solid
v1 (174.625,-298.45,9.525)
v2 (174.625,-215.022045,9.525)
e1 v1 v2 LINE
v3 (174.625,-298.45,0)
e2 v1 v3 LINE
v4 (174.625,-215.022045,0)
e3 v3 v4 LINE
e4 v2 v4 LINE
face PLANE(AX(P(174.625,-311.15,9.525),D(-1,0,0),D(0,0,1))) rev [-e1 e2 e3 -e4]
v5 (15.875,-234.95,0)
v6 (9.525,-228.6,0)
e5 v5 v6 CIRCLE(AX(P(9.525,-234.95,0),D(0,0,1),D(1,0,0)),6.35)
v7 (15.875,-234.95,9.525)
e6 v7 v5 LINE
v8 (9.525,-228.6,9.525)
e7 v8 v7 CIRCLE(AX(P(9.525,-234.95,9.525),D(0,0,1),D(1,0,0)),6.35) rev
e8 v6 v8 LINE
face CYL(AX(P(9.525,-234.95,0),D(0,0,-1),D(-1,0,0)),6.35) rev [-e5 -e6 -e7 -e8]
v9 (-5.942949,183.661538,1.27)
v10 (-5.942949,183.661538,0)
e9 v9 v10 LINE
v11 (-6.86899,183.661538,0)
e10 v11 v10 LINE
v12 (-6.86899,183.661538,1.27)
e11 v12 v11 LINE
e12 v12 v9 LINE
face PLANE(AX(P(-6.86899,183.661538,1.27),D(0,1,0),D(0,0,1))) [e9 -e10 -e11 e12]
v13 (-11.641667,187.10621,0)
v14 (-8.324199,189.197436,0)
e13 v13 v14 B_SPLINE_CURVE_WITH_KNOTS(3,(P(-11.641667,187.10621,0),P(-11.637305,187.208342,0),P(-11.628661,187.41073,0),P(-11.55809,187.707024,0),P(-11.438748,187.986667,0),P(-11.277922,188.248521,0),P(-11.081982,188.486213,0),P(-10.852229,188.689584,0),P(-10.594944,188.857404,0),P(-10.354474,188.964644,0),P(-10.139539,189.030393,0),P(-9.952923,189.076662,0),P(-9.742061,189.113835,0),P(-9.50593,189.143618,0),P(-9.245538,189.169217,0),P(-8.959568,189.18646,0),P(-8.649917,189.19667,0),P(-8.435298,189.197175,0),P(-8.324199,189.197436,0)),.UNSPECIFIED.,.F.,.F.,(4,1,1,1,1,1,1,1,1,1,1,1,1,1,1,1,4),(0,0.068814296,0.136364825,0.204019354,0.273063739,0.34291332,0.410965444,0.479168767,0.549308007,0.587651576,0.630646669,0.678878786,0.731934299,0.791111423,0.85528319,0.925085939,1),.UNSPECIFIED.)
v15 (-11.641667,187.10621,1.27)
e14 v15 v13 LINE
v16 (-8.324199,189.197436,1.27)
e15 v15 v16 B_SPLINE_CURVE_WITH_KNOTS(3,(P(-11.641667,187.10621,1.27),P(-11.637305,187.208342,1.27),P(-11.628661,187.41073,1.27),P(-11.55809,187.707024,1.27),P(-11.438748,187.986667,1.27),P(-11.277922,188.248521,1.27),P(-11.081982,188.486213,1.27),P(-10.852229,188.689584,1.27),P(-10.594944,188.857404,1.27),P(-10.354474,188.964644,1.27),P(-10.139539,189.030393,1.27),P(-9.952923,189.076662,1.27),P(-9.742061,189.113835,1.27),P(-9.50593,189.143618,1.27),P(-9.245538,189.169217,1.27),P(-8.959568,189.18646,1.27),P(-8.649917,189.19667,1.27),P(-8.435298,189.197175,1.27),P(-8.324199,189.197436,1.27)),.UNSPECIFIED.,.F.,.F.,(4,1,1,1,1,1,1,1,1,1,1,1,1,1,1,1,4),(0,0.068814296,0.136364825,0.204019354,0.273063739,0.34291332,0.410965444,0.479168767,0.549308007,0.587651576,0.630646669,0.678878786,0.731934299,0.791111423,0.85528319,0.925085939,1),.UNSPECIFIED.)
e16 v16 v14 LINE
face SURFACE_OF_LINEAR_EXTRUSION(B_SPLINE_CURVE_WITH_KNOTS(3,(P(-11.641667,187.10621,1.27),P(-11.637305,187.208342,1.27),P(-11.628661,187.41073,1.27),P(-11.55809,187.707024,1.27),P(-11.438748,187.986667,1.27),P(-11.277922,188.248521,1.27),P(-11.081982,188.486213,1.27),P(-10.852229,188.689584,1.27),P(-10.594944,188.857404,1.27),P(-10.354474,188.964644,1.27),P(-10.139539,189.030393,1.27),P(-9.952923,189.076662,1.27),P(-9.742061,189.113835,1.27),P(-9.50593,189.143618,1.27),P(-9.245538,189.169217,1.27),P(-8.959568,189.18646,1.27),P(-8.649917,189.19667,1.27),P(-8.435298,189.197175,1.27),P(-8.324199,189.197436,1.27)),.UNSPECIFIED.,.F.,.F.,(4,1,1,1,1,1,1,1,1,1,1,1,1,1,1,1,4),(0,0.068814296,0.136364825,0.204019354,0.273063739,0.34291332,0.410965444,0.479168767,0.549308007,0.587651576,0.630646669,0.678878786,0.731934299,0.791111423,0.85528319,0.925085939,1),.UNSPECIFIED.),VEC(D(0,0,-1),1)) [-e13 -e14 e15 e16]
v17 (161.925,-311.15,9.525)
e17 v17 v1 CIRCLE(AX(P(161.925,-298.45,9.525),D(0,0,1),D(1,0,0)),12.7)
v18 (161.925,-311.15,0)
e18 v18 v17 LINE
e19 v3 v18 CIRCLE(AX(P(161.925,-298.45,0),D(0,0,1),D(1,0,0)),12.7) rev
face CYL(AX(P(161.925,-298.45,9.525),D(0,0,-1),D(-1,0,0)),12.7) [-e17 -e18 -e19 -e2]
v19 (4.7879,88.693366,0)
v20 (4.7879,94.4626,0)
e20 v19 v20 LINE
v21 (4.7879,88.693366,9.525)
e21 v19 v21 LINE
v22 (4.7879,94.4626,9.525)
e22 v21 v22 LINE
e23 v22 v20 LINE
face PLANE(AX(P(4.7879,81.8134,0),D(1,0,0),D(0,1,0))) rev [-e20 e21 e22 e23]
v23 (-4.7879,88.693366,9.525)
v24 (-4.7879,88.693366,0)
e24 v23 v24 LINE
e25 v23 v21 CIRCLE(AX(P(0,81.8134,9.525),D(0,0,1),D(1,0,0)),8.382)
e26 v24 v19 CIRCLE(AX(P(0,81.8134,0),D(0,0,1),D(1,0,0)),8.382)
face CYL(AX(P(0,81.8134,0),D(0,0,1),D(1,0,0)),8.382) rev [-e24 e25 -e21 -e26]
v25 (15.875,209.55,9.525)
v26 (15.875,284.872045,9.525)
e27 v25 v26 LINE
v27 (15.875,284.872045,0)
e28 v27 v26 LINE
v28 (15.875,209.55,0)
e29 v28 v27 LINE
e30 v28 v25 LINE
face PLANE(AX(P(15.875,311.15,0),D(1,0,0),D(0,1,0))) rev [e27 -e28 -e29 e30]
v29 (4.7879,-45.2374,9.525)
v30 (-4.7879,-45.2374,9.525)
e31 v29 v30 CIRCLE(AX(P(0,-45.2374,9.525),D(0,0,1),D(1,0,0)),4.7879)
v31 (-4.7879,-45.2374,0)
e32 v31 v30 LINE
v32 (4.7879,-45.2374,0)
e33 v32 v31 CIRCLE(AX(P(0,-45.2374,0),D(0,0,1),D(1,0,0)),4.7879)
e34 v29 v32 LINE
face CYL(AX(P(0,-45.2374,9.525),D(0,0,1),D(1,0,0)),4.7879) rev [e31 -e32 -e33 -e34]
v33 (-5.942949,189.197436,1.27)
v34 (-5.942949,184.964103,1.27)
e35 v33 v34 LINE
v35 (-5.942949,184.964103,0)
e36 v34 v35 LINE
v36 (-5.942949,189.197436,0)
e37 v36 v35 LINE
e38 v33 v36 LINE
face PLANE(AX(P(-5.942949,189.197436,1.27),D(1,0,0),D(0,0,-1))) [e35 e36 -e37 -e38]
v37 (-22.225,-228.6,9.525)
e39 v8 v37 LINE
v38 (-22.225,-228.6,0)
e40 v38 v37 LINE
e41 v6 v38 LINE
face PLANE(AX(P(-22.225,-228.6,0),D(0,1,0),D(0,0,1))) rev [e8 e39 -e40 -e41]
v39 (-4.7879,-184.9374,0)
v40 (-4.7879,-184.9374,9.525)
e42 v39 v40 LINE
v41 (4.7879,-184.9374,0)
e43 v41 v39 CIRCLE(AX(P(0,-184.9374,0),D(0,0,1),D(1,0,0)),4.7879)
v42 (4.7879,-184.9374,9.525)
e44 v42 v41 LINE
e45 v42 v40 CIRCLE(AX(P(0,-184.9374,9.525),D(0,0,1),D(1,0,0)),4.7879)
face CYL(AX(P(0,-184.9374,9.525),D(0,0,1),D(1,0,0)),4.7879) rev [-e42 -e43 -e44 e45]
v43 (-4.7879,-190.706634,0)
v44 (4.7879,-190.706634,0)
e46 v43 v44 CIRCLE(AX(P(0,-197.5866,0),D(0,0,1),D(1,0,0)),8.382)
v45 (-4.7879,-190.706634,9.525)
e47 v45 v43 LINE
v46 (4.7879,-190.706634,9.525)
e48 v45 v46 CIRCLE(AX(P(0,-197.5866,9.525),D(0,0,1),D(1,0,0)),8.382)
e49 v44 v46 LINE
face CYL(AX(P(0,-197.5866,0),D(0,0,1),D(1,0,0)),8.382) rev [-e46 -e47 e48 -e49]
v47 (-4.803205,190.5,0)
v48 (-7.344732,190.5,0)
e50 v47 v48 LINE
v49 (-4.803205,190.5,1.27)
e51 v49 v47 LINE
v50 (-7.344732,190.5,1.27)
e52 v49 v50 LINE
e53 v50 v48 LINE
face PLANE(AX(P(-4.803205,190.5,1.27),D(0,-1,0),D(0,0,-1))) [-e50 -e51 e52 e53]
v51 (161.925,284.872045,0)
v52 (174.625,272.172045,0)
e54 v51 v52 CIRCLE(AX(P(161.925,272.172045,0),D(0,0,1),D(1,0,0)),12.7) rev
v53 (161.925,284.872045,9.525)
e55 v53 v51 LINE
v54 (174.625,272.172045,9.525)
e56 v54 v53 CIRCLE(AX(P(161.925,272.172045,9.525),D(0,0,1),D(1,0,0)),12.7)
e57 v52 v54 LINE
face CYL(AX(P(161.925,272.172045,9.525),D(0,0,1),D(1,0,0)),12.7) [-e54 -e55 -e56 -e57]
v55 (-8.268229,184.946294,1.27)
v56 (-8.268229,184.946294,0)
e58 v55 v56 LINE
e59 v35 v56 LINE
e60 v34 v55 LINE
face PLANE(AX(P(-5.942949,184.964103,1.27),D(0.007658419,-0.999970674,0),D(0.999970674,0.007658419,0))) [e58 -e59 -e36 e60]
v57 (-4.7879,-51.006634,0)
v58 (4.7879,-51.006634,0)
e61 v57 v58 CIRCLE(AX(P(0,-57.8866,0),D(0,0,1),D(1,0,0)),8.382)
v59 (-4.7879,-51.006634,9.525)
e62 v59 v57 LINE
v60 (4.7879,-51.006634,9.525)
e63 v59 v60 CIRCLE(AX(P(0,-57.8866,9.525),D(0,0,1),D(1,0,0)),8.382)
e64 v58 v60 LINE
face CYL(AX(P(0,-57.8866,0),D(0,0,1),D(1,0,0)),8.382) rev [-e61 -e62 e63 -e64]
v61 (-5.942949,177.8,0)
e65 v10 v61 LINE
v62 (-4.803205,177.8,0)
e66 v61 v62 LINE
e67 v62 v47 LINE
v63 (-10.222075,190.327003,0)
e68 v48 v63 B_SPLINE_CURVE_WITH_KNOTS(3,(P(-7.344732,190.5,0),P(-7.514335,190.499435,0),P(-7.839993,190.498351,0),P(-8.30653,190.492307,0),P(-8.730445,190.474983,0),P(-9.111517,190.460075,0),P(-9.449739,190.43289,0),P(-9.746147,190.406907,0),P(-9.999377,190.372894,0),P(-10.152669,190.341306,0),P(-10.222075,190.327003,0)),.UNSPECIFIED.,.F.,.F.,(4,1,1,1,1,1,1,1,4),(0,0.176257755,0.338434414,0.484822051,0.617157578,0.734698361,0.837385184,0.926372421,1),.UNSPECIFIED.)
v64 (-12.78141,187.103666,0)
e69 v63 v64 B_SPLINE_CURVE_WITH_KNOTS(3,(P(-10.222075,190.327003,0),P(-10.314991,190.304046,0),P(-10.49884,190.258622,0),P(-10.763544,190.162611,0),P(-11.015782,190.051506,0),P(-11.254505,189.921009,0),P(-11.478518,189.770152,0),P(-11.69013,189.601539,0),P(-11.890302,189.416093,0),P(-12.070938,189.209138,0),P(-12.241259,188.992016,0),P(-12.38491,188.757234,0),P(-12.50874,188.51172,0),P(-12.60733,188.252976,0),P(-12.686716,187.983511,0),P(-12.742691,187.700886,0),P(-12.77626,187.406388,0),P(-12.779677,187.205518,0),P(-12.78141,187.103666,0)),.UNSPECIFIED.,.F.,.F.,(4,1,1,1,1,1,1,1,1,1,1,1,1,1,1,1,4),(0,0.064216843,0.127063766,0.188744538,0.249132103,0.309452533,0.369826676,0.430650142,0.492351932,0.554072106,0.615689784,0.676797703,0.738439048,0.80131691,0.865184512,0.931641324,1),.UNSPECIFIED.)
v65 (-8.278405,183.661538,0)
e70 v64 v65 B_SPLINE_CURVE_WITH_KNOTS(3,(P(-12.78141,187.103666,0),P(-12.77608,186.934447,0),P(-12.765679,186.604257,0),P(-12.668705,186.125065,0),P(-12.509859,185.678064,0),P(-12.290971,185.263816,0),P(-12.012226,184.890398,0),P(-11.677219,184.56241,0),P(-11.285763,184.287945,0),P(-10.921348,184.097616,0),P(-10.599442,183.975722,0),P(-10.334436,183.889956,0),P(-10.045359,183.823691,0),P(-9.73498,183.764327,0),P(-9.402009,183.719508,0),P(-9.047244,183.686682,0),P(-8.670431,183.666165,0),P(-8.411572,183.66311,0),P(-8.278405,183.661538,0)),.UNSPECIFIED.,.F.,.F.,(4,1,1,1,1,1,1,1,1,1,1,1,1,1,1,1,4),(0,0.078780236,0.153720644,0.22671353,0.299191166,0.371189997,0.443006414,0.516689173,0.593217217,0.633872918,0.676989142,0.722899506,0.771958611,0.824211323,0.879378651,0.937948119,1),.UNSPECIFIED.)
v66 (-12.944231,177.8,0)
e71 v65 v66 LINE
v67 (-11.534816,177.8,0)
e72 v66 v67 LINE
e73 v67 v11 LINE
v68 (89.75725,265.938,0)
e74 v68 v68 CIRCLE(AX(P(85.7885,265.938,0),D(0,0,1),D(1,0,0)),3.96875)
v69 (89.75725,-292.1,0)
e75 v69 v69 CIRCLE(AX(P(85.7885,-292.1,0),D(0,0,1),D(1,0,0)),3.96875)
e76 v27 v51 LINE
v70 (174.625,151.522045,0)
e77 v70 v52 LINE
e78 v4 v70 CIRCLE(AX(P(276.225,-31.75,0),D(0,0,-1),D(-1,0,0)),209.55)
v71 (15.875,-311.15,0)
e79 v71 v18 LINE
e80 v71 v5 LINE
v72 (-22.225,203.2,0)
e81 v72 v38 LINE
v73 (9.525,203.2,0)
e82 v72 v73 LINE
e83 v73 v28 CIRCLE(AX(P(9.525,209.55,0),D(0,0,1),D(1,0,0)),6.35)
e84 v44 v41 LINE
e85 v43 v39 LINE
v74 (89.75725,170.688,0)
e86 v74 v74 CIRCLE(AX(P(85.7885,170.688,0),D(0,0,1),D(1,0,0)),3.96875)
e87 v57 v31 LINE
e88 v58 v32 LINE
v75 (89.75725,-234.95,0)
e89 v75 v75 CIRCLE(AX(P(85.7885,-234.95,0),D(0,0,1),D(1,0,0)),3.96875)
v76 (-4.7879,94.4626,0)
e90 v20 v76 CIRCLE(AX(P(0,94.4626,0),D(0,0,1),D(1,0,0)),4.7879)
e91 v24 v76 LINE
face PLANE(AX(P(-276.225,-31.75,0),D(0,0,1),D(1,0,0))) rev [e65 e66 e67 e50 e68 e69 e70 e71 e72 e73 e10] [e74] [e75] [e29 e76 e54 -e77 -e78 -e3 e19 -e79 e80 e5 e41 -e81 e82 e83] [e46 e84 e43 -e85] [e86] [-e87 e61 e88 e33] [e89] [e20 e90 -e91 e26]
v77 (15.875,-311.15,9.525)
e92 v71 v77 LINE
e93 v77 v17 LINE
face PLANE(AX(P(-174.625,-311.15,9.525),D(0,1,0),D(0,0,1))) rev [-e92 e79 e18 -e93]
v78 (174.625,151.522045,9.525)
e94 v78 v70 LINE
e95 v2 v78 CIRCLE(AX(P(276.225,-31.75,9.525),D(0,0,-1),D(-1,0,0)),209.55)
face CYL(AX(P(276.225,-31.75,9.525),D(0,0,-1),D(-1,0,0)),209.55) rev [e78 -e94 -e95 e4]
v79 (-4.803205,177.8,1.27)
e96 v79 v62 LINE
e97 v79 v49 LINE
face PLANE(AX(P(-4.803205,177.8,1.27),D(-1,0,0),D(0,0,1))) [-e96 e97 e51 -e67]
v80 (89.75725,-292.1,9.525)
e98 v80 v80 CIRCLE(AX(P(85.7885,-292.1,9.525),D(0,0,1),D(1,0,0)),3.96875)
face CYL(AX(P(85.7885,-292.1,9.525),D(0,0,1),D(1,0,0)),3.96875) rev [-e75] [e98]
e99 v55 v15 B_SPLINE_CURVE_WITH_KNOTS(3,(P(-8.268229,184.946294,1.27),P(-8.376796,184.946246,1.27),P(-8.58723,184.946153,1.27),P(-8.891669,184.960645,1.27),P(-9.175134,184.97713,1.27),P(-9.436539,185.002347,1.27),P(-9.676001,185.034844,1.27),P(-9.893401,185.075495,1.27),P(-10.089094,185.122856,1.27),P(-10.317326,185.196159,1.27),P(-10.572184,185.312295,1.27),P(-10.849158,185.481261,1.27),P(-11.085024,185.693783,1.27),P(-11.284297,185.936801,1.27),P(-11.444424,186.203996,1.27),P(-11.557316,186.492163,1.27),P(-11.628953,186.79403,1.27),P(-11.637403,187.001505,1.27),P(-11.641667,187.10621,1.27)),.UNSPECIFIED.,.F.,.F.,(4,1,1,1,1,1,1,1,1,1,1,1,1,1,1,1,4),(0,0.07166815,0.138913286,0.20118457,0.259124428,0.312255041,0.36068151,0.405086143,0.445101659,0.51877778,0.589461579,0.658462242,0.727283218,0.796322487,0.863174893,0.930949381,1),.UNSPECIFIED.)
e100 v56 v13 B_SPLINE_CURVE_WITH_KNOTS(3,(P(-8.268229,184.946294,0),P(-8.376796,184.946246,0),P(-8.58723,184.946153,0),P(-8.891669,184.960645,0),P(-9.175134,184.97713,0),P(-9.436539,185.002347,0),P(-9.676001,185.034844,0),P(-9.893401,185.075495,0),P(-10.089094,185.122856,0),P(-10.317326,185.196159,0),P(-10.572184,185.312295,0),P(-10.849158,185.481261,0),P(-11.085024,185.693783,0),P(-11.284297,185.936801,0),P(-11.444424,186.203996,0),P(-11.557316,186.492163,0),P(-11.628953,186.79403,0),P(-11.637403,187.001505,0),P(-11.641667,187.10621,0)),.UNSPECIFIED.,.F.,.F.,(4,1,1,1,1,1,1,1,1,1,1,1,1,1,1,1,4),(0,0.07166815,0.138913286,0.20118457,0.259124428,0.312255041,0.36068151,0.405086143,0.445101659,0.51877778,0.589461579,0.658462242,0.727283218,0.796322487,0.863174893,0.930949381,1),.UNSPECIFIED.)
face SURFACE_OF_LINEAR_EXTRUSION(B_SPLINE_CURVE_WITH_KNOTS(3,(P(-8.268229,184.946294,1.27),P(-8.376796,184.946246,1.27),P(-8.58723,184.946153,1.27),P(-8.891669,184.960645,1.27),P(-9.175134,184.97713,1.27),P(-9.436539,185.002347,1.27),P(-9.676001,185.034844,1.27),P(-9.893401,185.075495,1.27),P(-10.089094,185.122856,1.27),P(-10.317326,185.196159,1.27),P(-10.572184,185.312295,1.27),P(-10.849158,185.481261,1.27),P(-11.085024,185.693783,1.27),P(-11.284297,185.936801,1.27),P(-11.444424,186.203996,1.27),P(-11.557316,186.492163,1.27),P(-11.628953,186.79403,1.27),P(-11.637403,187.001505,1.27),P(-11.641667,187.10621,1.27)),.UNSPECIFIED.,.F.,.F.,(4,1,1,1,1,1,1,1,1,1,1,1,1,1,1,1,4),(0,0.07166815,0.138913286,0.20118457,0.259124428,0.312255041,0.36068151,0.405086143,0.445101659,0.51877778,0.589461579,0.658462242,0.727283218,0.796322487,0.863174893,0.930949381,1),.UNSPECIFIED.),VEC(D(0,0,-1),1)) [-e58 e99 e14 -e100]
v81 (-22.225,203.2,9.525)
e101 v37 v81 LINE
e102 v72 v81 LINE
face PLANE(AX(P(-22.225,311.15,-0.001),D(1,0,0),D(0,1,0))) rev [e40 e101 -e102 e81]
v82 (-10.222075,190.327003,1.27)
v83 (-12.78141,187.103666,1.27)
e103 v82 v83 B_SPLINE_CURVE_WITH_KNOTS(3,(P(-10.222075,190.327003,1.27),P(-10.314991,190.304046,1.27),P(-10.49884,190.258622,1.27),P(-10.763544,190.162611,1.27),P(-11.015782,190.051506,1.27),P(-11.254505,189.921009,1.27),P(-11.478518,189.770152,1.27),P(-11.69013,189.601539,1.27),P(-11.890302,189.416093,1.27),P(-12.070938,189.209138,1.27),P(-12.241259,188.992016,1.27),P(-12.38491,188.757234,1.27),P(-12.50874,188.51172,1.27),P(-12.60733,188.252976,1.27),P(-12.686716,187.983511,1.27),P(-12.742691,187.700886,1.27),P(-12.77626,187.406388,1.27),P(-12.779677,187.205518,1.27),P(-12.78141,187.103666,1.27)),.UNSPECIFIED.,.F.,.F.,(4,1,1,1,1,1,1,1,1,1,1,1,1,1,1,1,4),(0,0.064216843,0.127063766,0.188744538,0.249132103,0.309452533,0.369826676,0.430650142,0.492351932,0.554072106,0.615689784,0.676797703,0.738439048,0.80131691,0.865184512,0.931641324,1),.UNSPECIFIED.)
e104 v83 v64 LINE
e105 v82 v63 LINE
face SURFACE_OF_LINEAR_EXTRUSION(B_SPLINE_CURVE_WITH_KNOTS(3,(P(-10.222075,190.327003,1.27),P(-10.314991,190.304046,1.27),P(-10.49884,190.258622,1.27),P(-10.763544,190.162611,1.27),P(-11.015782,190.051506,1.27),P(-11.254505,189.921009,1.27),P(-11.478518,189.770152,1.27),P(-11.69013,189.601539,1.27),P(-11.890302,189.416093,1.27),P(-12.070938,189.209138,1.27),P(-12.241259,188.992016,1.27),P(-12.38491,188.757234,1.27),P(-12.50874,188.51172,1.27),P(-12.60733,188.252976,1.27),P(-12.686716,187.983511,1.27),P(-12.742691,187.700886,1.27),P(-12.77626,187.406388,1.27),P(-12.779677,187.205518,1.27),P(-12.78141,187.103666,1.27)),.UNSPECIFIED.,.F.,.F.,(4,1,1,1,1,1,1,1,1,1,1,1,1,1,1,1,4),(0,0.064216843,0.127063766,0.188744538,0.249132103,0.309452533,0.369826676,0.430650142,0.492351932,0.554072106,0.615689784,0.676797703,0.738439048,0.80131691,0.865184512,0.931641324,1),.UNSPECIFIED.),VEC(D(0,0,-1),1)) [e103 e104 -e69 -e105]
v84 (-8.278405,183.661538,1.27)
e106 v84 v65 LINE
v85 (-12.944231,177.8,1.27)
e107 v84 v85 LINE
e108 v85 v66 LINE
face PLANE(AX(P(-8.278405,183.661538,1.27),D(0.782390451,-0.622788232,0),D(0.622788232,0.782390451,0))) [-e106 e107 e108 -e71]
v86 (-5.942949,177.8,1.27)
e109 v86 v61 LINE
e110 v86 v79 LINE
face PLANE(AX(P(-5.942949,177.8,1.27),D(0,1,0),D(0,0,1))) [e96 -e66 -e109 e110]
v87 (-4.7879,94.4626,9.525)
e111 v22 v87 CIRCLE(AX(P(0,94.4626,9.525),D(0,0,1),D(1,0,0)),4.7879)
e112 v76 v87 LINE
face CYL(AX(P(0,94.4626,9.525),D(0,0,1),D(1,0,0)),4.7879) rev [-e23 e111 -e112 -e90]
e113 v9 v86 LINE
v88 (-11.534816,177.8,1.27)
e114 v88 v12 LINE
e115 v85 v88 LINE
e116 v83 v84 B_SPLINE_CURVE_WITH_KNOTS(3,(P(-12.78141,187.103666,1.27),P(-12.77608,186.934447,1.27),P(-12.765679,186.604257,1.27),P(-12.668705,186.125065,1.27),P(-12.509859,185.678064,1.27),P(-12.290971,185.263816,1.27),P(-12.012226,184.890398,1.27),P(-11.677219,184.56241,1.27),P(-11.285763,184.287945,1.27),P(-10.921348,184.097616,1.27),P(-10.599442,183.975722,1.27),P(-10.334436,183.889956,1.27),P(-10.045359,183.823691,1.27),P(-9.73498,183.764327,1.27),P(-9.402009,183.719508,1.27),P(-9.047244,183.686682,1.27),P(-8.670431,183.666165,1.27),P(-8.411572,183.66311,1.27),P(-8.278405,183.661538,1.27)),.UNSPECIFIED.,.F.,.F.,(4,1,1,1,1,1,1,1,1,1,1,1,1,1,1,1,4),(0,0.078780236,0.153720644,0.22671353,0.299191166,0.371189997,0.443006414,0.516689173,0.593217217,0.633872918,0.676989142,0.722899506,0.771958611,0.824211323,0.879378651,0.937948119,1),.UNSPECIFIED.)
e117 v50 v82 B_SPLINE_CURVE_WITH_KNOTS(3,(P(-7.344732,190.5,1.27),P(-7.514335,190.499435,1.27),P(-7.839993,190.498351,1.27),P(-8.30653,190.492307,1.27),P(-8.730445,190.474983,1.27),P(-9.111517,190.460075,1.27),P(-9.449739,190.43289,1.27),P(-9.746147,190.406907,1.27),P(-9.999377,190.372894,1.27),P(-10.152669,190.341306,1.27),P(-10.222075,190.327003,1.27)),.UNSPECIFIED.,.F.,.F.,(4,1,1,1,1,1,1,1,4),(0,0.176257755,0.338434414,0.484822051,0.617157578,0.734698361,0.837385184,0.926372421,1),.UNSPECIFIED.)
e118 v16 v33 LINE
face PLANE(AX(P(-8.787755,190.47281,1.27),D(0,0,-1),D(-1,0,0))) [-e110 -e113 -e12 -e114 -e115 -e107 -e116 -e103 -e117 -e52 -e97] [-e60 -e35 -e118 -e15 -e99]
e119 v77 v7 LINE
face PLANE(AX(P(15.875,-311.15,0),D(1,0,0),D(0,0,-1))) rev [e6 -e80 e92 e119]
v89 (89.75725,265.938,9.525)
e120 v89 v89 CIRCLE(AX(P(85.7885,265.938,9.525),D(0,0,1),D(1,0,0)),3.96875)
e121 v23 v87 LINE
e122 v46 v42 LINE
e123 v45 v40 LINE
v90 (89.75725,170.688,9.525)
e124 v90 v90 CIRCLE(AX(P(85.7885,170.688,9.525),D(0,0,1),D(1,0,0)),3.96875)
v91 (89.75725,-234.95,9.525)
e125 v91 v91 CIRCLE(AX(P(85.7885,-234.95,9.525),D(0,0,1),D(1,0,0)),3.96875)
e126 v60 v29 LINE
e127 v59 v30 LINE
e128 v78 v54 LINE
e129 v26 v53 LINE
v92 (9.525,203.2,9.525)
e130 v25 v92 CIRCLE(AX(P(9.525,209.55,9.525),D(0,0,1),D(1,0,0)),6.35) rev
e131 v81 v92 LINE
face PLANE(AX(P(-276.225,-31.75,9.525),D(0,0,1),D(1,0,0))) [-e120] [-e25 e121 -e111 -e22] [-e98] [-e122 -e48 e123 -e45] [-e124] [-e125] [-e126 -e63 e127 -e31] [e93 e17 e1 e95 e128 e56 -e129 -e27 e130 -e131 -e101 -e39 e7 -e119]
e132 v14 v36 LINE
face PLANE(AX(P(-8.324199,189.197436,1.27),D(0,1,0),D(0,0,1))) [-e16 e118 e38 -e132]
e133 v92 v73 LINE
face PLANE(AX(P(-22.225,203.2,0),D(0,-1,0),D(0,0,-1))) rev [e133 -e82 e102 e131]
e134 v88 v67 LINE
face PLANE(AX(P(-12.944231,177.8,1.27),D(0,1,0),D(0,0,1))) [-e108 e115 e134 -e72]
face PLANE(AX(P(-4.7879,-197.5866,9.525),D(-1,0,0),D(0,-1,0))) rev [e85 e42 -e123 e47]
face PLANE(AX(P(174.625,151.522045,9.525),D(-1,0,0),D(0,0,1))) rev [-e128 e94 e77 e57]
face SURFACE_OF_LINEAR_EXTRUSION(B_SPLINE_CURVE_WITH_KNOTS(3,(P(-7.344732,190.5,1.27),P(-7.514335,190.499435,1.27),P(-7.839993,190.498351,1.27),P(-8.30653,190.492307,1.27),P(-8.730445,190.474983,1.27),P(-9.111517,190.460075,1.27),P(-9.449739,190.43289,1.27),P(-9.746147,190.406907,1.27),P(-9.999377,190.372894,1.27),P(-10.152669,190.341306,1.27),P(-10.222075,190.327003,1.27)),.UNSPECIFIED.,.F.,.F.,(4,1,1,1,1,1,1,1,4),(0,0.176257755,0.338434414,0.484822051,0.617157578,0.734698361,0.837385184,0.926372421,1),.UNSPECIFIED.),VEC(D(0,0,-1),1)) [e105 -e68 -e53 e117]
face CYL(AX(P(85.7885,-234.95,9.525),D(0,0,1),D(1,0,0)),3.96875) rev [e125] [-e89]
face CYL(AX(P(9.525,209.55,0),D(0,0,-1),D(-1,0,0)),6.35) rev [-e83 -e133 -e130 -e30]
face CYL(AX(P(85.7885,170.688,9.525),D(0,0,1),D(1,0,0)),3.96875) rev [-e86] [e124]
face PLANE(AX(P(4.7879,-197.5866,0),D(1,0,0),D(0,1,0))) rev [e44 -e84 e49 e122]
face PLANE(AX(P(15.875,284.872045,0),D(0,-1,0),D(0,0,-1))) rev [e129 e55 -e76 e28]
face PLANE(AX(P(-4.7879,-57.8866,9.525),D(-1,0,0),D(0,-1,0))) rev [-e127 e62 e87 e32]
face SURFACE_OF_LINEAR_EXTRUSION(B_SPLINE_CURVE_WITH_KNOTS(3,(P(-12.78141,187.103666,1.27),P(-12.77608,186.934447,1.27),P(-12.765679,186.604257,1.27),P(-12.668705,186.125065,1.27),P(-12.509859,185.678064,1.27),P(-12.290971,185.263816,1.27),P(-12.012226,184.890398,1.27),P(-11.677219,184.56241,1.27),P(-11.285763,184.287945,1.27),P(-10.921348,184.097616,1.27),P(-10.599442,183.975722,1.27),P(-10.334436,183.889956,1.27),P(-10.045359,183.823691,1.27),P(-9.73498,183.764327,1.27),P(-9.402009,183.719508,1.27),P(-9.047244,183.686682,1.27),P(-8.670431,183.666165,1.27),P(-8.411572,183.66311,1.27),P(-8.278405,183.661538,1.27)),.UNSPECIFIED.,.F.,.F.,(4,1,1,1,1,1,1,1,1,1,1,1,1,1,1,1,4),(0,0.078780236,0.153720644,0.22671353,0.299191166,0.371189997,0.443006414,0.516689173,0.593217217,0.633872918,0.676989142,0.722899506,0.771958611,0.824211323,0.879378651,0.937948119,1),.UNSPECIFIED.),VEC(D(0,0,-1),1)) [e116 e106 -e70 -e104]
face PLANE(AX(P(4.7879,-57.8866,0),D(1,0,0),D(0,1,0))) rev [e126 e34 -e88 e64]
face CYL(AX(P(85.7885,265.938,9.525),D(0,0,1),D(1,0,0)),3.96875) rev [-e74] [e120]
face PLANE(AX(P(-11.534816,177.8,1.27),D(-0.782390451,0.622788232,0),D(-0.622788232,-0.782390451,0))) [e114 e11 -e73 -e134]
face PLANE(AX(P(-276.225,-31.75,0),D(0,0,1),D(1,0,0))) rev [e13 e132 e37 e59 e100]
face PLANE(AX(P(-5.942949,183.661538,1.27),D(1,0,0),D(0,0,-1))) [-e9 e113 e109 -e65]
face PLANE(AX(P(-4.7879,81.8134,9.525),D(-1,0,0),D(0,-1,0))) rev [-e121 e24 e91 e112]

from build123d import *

# Parameters (mm, degrees)
BOSS_EXTRUDE1_DEPTH            = 9.525
V_0_377_DIAMETER_SLOT2_DEPTH   = 9.525
CUT_EXTRUDE1_REACH             = 358.93
SKETCH6_W                      = 152.4
SKETCH6_H                      = 622.3
FILLET1_R                      = 12.7
SKETCH7_R                      = 8.382
CUT_EXTRUDE2_DEPTH             = 357.929879318
SKETCH12_W                     = 38.1
SKETCH12_H                     = 107.95
SKETCH12_H_2                   = 82.55
CUT_EXTRUDE3_DEPTH             = 357.929879318
FILLET2_R                      = 6.35
F_5_16_0_3125_DIAMETER_HOLE1_D = 7.9375
SKETCH16_W                     = 158.75
SKETCH16_H                     = 26.277954941
CUT_EXTRUDE4_DEPTH             = 357.929879318
F_5_16_0_3125_DIAMETER_HOLE2_D = 7.9375
FILLET3_R                      = 12.7
CUT_EXTRUDE5_DEPTH             = 1.27


# Read off the part's stored shape, not the designer's step: V (0.377) Diameter Slot2
with BuildPart() as part:
    # Sketch1 → Boss-Extrude1 (new body)
    with BuildSketch(Plane.XY):
        with BuildLine():
            Line((-174.625, 151.522045059), (-174.625, 311.15))
            Line((-174.625, 311.15), (174.625, 311.15))
            Line((174.625, 311.15), (174.625, 151.522045059))
            ThreePointArc((174.625, 151.522045059), (66.675, -31.75), (174.625, -215.022045059))
            Line((174.625, -215.022045059), (174.625, -311.15))
            Line((174.625, -311.15), (-174.625, -311.15))
            Line((-174.625, -311.15), (-174.625, -215.022045059))
            ThreePointArc((-174.625, -215.022045059), (-66.675, -31.75), (-174.625, 151.522045059))
        make_face()
    extrude(amount=BOSS_EXTRUDE1_DEPTH)

    # V (0.377) Diameter Slot2 outline → V (0.377) Diameter Slot2 (cut)
    with BuildSketch(Plane.XY):
        with BuildLine():
            Line((4.7879, -57.8866), (4.7879, -45.2374))
            ThreePointArc((4.7879, -45.2374), (0, -40.4495), (-4.7879, -45.2374))
            Line((-4.7879, -45.2374), (-4.7879, -57.8866))
            ThreePointArc((-4.7879, -57.8866), (0, -62.6745), (4.7879, -57.8866))
        make_face()
        with BuildLine():
            ThreePointArc((4.7879, 94.4626), (0, 99.2505), (-4.7879, 94.4626))
            Line((-4.7879, 94.4626), (-4.7879, 81.8134))
            ThreePointArc((-4.7879, 81.8134), (0, 77.0255), (4.7879, 81.8134))
            Line((4.7879, 81.8134), (4.7879, 94.4626))
        make_face()
        with BuildLine():
            ThreePointArc((4.7879, -184.9374), (0, -180.1495), (-4.7879, -184.9374))
            Line((-4.7879, -184.9374), (-4.7879, -197.5866))
            ThreePointArc((-4.7879, -197.5866), (0, -202.3745), (4.7879, -197.5866))
            Line((4.7879, -197.5866), (4.7879, -184.9374))
        make_face()
    extrude(amount=V_0_377_DIAMETER_SLOT2_DEPTH, mode=Mode.SUBTRACT)

    # Sketch6 → Cut-Extrude1 (cut, up to next)
    with BuildSketch(Plane.XY.offset(9.525), mode=Mode.PRIVATE) as cut_extrude1_sk1:
        with Locations((-98.425, 0)):
            Rectangle(SKETCH6_W, SKETCH6_H)
    cut_extrude1_tool1 = extrude(cut_extrude1_sk1.sketch, amount=-CUT_EXTRUDE1_REACH, mode=Mode.PRIVATE) & part.part
    add(cut_extrude1_tool1.solids().sort_by_distance((-98.425, 0, 9.525))[0], mode=Mode.SUBTRACT)

    # Fillet1
    fillet1_edges = [part.edges().sort_by_distance(p)[0] for p in [
        (174.625, -311.15, 4.7625),
    ]]
    fillet(fillet1_edges, radius=FILLET1_R)

    # Sketch7 → Cut-Extrude2 (cut, through all)
    with BuildSketch(Plane.XY.offset(9.525)):
        with Locations((0, -197.5866)):
            Circle(SKETCH7_R)
        with Locations((0, 81.8134)):
            Circle(SKETCH7_R)
        with Locations((0, -57.8866)):
            Circle(SKETCH7_R)
    extrude(amount=-CUT_EXTRUDE2_DEPTH, mode=Mode.SUBTRACT)

    # Sketch12 → Cut-Extrude3 (cut, through all)
    with BuildSketch(Plane.XY.offset(9.525)):
        with Locations((-3.175, 257.175)):
            Rectangle(SKETCH12_W, SKETCH12_H)
        with Locations((-3.175, -269.875)):
            Rectangle(SKETCH12_W, SKETCH12_H_2)
    extrude(amount=-CUT_EXTRUDE3_DEPTH, mode=Mode.SUBTRACT)

    # Fillet2
    fillet2_edges = [part.edges().sort_by_distance(p)[0] for p in [
        (15.875, 203.2, 4.7625),
        (15.875, -228.6, 4.7625),
    ]]
    fillet(fillet2_edges, radius=FILLET2_R)

    # 5/16 (0.3125) Diameter Hole1 (through all)
    with Locations(Plane.XY.offset(9.525)):
        with Locations((85.7885, 170.688), (85.7885, 265.938)):
            Hole(F_5_16_0_3125_DIAMETER_HOLE1_D / 2)

    # Sketch16 → Cut-Extrude4 (cut, through all)
    with BuildSketch(Plane.XY.offset(9.525)):
        with Locations((95.25, 298.011022529)):
            Rectangle(SKETCH16_W, SKETCH16_H)
    extrude(amount=-CUT_EXTRUDE4_DEPTH, mode=Mode.SUBTRACT)

    # 5/16 (0.3125) Diameter Hole2 (through all)
    with Locations(Plane.XY.offset(9.525)):
        with Locations((85.7885, -234.95), (85.7885, -292.1)):
            Hole(F_5_16_0_3125_DIAMETER_HOLE2_D / 2)

    # Fillet3
    fillet3_edges = [part.edges().sort_by_distance(p)[0] for p in [
        (174.625, 284.872045059, 4.7625),
    ]]
    fillet(fillet3_edges, radius=FILLET3_R)

    # Sketch22 → Cut-Extrude5 (cut)
    with BuildSketch(Plane(origin=(0, 0, 0), x_dir=(-1, 0, 0), z_dir=(0, 0, -1))):
        with BuildLine():
            Line((4.803205128, 190.5), (7.344731571, 190.5))
            add(Edge.make_bspline(
                [(7.344731571, 190.5), (7.514335094, 190.499435445), (7.839992647, 190.498351437), (8.306529942, 190.492307098), (8.730445408, 190.474983007), (9.111517396, 190.460074718), (9.449738916, 190.432889674), (9.746147085, 190.406906754), (9.99937673, 190.372893757), (10.152668819, 190.341305508), (10.222075321, 190.327003205)],
                knots=[0, 0, 0, 0, 1.410062039, 2.707475311, 3.878576406, 4.937260626, 5.877586885, 6.699081471, 7.410979367, 8, 8, 8, 8], degree=3))
            add(Edge.make_bspline(
                [(10.222075321, 190.327003205), (10.314990785, 190.304046085), (10.498839576, 190.258621583), (10.763544101, 190.162611031), (11.015781791, 190.051505536), (11.254504868, 189.921008608), (11.478517596, 189.77015155), (11.690129752, 189.601538649), (11.890301576, 189.416092502), (12.070937777, 189.209137506), (12.241259479, 188.992016457), (12.384909638, 188.757234253), (12.508740007, 188.511719568), (12.607330169, 188.252975509), (12.686715958, 187.983511365), (12.74269117, 187.700886303), (12.776259765, 187.406387908), (12.779677355, 187.205517781), (12.781410256, 187.103665865)],
                knots=[0, 0, 0, 0, 1.027469482, 2.033020251, 3.019912614, 3.986113645, 4.951240523, 5.91722682, 6.890402269, 7.87763091, 8.8651537, 9.85103654, 10.82876324, 11.815024772, 12.821070561, 13.842952187, 14.906261191, 16, 16, 16, 16], degree=3))
            add(Edge.make_bspline(
                [(12.781410256, 187.103665865), (12.776079892, 186.934447057), (12.76567897, 186.604257334), (12.668705022, 186.125064993), (12.509858794, 185.678063765), (12.290971431, 185.263816479), (12.012226476, 184.890397852), (11.677219377, 184.562409628), (11.285763244, 184.287944802), (10.921348297, 184.097616054), (10.599442487, 183.975721785), (10.334435895, 183.889955569), (10.045358576, 183.823690724), (9.734980248, 183.764326817), (9.40200927, 183.719507811), (9.047243698, 183.686681597), (8.670430519, 183.666165478), (8.41157161, 183.663110203), (8.278405449, 183.661538462)],
                knots=[0, 0, 0, 0, 1.260483769, 2.459530307, 3.627416485, 4.787058657, 5.939039949, 7.08810263, 8.267026773, 9.491475466, 10.141966685, 10.831826277, 11.566392101, 12.351337768, 13.187381173, 14.07005841, 15.007169909, 16, 16, 16, 16], degree=3))
            Line((8.278405449, 183.661538462), (12.944230769, 177.8))
            Line((12.944230769, 177.8), (11.534815705, 177.8))
            Line((11.534815705, 177.8), (6.868990385, 183.661538462))
            Line((6.868990385, 183.661538462), (5.942948718, 183.661538462))
            Line((5.942948718, 183.661538462), (5.942948718, 177.8))
            Line((5.942948718, 177.8), (4.803205128, 177.8))
            Line((4.803205128, 177.8), (4.803205128, 190.5))
        make_face()
        with BuildLine():
            Line((5.942948718, 189.197435897), (5.942948718, 184.964102564))
            Line((5.942948718, 184.964102564), (8.268229167, 184.946294071))
            add(Edge.make_bspline(
                [(8.268229167, 184.946294071), (8.376796165, 184.94624604), (8.587229929, 184.946152944), (8.891669485, 184.960644647), (9.17513389, 184.977130401), (9.436538905, 185.002346598), (9.676001307, 185.034844344), (9.893401406, 185.075495173), (10.08909408, 185.122855514), (10.31732592, 185.196158556), (10.572184191, 185.31229468), (10.849158345, 185.481260918), (11.085023971, 185.69378315), (11.284297357, 185.936801119), (11.444424151, 186.203995508), (11.557316462, 186.492163476), (11.628953324, 186.794030132), (11.637402618, 187.00150498), (11.641666667, 187.106209936)],
                knots=[0, 0, 0, 0, 1.146690395, 2.22261258, 3.21895312, 4.145990853, 4.996080663, 5.770904154, 6.481378293, 7.121626537, 8.300444488, 9.431385265, 10.535395872, 11.636531494, 12.74115979, 13.810798291, 14.895190096, 16, 16, 16, 16], degree=3))
            add(Edge.make_bspline(
                [(11.641666667, 187.106209936), (11.637304684, 187.208341789), (11.628660827, 187.410729855), (11.558089581, 187.707024158), (11.438748112, 187.986667092), (11.277921706, 188.24852108), (11.081981915, 188.486213322), (10.852228709, 188.68958442), (10.594944144, 188.857403906), (10.354474367, 188.964644087), (10.139538796, 189.030393268), (9.952922601, 189.076661777), (9.742060953, 189.113834564), (9.505930003, 189.143618099), (9.2455378, 189.169217469), (8.959567723, 189.186459637), (8.649917121, 189.196669944), (8.435298256, 189.197174638), (8.324198718, 189.197435897)],
                knots=[0, 0, 0, 0, 1.101028733, 2.181837193, 3.264309656, 4.369019818, 5.486613113, 6.575447106, 7.666700264, 8.788928104, 9.402425223, 10.0903467, 10.862060571, 11.710948788, 12.657782767, 13.684531032, 14.801375019, 16, 16, 16, 16], degree=3))
            Line((8.324198718, 189.197435897), (5.942948718, 189.197435897))
        make_face(mode=Mode.SUBTRACT)
    extrude(amount=-CUT_EXTRUDE5_DEPTH, mode=Mode.SUBTRACT)


solid = part.part
